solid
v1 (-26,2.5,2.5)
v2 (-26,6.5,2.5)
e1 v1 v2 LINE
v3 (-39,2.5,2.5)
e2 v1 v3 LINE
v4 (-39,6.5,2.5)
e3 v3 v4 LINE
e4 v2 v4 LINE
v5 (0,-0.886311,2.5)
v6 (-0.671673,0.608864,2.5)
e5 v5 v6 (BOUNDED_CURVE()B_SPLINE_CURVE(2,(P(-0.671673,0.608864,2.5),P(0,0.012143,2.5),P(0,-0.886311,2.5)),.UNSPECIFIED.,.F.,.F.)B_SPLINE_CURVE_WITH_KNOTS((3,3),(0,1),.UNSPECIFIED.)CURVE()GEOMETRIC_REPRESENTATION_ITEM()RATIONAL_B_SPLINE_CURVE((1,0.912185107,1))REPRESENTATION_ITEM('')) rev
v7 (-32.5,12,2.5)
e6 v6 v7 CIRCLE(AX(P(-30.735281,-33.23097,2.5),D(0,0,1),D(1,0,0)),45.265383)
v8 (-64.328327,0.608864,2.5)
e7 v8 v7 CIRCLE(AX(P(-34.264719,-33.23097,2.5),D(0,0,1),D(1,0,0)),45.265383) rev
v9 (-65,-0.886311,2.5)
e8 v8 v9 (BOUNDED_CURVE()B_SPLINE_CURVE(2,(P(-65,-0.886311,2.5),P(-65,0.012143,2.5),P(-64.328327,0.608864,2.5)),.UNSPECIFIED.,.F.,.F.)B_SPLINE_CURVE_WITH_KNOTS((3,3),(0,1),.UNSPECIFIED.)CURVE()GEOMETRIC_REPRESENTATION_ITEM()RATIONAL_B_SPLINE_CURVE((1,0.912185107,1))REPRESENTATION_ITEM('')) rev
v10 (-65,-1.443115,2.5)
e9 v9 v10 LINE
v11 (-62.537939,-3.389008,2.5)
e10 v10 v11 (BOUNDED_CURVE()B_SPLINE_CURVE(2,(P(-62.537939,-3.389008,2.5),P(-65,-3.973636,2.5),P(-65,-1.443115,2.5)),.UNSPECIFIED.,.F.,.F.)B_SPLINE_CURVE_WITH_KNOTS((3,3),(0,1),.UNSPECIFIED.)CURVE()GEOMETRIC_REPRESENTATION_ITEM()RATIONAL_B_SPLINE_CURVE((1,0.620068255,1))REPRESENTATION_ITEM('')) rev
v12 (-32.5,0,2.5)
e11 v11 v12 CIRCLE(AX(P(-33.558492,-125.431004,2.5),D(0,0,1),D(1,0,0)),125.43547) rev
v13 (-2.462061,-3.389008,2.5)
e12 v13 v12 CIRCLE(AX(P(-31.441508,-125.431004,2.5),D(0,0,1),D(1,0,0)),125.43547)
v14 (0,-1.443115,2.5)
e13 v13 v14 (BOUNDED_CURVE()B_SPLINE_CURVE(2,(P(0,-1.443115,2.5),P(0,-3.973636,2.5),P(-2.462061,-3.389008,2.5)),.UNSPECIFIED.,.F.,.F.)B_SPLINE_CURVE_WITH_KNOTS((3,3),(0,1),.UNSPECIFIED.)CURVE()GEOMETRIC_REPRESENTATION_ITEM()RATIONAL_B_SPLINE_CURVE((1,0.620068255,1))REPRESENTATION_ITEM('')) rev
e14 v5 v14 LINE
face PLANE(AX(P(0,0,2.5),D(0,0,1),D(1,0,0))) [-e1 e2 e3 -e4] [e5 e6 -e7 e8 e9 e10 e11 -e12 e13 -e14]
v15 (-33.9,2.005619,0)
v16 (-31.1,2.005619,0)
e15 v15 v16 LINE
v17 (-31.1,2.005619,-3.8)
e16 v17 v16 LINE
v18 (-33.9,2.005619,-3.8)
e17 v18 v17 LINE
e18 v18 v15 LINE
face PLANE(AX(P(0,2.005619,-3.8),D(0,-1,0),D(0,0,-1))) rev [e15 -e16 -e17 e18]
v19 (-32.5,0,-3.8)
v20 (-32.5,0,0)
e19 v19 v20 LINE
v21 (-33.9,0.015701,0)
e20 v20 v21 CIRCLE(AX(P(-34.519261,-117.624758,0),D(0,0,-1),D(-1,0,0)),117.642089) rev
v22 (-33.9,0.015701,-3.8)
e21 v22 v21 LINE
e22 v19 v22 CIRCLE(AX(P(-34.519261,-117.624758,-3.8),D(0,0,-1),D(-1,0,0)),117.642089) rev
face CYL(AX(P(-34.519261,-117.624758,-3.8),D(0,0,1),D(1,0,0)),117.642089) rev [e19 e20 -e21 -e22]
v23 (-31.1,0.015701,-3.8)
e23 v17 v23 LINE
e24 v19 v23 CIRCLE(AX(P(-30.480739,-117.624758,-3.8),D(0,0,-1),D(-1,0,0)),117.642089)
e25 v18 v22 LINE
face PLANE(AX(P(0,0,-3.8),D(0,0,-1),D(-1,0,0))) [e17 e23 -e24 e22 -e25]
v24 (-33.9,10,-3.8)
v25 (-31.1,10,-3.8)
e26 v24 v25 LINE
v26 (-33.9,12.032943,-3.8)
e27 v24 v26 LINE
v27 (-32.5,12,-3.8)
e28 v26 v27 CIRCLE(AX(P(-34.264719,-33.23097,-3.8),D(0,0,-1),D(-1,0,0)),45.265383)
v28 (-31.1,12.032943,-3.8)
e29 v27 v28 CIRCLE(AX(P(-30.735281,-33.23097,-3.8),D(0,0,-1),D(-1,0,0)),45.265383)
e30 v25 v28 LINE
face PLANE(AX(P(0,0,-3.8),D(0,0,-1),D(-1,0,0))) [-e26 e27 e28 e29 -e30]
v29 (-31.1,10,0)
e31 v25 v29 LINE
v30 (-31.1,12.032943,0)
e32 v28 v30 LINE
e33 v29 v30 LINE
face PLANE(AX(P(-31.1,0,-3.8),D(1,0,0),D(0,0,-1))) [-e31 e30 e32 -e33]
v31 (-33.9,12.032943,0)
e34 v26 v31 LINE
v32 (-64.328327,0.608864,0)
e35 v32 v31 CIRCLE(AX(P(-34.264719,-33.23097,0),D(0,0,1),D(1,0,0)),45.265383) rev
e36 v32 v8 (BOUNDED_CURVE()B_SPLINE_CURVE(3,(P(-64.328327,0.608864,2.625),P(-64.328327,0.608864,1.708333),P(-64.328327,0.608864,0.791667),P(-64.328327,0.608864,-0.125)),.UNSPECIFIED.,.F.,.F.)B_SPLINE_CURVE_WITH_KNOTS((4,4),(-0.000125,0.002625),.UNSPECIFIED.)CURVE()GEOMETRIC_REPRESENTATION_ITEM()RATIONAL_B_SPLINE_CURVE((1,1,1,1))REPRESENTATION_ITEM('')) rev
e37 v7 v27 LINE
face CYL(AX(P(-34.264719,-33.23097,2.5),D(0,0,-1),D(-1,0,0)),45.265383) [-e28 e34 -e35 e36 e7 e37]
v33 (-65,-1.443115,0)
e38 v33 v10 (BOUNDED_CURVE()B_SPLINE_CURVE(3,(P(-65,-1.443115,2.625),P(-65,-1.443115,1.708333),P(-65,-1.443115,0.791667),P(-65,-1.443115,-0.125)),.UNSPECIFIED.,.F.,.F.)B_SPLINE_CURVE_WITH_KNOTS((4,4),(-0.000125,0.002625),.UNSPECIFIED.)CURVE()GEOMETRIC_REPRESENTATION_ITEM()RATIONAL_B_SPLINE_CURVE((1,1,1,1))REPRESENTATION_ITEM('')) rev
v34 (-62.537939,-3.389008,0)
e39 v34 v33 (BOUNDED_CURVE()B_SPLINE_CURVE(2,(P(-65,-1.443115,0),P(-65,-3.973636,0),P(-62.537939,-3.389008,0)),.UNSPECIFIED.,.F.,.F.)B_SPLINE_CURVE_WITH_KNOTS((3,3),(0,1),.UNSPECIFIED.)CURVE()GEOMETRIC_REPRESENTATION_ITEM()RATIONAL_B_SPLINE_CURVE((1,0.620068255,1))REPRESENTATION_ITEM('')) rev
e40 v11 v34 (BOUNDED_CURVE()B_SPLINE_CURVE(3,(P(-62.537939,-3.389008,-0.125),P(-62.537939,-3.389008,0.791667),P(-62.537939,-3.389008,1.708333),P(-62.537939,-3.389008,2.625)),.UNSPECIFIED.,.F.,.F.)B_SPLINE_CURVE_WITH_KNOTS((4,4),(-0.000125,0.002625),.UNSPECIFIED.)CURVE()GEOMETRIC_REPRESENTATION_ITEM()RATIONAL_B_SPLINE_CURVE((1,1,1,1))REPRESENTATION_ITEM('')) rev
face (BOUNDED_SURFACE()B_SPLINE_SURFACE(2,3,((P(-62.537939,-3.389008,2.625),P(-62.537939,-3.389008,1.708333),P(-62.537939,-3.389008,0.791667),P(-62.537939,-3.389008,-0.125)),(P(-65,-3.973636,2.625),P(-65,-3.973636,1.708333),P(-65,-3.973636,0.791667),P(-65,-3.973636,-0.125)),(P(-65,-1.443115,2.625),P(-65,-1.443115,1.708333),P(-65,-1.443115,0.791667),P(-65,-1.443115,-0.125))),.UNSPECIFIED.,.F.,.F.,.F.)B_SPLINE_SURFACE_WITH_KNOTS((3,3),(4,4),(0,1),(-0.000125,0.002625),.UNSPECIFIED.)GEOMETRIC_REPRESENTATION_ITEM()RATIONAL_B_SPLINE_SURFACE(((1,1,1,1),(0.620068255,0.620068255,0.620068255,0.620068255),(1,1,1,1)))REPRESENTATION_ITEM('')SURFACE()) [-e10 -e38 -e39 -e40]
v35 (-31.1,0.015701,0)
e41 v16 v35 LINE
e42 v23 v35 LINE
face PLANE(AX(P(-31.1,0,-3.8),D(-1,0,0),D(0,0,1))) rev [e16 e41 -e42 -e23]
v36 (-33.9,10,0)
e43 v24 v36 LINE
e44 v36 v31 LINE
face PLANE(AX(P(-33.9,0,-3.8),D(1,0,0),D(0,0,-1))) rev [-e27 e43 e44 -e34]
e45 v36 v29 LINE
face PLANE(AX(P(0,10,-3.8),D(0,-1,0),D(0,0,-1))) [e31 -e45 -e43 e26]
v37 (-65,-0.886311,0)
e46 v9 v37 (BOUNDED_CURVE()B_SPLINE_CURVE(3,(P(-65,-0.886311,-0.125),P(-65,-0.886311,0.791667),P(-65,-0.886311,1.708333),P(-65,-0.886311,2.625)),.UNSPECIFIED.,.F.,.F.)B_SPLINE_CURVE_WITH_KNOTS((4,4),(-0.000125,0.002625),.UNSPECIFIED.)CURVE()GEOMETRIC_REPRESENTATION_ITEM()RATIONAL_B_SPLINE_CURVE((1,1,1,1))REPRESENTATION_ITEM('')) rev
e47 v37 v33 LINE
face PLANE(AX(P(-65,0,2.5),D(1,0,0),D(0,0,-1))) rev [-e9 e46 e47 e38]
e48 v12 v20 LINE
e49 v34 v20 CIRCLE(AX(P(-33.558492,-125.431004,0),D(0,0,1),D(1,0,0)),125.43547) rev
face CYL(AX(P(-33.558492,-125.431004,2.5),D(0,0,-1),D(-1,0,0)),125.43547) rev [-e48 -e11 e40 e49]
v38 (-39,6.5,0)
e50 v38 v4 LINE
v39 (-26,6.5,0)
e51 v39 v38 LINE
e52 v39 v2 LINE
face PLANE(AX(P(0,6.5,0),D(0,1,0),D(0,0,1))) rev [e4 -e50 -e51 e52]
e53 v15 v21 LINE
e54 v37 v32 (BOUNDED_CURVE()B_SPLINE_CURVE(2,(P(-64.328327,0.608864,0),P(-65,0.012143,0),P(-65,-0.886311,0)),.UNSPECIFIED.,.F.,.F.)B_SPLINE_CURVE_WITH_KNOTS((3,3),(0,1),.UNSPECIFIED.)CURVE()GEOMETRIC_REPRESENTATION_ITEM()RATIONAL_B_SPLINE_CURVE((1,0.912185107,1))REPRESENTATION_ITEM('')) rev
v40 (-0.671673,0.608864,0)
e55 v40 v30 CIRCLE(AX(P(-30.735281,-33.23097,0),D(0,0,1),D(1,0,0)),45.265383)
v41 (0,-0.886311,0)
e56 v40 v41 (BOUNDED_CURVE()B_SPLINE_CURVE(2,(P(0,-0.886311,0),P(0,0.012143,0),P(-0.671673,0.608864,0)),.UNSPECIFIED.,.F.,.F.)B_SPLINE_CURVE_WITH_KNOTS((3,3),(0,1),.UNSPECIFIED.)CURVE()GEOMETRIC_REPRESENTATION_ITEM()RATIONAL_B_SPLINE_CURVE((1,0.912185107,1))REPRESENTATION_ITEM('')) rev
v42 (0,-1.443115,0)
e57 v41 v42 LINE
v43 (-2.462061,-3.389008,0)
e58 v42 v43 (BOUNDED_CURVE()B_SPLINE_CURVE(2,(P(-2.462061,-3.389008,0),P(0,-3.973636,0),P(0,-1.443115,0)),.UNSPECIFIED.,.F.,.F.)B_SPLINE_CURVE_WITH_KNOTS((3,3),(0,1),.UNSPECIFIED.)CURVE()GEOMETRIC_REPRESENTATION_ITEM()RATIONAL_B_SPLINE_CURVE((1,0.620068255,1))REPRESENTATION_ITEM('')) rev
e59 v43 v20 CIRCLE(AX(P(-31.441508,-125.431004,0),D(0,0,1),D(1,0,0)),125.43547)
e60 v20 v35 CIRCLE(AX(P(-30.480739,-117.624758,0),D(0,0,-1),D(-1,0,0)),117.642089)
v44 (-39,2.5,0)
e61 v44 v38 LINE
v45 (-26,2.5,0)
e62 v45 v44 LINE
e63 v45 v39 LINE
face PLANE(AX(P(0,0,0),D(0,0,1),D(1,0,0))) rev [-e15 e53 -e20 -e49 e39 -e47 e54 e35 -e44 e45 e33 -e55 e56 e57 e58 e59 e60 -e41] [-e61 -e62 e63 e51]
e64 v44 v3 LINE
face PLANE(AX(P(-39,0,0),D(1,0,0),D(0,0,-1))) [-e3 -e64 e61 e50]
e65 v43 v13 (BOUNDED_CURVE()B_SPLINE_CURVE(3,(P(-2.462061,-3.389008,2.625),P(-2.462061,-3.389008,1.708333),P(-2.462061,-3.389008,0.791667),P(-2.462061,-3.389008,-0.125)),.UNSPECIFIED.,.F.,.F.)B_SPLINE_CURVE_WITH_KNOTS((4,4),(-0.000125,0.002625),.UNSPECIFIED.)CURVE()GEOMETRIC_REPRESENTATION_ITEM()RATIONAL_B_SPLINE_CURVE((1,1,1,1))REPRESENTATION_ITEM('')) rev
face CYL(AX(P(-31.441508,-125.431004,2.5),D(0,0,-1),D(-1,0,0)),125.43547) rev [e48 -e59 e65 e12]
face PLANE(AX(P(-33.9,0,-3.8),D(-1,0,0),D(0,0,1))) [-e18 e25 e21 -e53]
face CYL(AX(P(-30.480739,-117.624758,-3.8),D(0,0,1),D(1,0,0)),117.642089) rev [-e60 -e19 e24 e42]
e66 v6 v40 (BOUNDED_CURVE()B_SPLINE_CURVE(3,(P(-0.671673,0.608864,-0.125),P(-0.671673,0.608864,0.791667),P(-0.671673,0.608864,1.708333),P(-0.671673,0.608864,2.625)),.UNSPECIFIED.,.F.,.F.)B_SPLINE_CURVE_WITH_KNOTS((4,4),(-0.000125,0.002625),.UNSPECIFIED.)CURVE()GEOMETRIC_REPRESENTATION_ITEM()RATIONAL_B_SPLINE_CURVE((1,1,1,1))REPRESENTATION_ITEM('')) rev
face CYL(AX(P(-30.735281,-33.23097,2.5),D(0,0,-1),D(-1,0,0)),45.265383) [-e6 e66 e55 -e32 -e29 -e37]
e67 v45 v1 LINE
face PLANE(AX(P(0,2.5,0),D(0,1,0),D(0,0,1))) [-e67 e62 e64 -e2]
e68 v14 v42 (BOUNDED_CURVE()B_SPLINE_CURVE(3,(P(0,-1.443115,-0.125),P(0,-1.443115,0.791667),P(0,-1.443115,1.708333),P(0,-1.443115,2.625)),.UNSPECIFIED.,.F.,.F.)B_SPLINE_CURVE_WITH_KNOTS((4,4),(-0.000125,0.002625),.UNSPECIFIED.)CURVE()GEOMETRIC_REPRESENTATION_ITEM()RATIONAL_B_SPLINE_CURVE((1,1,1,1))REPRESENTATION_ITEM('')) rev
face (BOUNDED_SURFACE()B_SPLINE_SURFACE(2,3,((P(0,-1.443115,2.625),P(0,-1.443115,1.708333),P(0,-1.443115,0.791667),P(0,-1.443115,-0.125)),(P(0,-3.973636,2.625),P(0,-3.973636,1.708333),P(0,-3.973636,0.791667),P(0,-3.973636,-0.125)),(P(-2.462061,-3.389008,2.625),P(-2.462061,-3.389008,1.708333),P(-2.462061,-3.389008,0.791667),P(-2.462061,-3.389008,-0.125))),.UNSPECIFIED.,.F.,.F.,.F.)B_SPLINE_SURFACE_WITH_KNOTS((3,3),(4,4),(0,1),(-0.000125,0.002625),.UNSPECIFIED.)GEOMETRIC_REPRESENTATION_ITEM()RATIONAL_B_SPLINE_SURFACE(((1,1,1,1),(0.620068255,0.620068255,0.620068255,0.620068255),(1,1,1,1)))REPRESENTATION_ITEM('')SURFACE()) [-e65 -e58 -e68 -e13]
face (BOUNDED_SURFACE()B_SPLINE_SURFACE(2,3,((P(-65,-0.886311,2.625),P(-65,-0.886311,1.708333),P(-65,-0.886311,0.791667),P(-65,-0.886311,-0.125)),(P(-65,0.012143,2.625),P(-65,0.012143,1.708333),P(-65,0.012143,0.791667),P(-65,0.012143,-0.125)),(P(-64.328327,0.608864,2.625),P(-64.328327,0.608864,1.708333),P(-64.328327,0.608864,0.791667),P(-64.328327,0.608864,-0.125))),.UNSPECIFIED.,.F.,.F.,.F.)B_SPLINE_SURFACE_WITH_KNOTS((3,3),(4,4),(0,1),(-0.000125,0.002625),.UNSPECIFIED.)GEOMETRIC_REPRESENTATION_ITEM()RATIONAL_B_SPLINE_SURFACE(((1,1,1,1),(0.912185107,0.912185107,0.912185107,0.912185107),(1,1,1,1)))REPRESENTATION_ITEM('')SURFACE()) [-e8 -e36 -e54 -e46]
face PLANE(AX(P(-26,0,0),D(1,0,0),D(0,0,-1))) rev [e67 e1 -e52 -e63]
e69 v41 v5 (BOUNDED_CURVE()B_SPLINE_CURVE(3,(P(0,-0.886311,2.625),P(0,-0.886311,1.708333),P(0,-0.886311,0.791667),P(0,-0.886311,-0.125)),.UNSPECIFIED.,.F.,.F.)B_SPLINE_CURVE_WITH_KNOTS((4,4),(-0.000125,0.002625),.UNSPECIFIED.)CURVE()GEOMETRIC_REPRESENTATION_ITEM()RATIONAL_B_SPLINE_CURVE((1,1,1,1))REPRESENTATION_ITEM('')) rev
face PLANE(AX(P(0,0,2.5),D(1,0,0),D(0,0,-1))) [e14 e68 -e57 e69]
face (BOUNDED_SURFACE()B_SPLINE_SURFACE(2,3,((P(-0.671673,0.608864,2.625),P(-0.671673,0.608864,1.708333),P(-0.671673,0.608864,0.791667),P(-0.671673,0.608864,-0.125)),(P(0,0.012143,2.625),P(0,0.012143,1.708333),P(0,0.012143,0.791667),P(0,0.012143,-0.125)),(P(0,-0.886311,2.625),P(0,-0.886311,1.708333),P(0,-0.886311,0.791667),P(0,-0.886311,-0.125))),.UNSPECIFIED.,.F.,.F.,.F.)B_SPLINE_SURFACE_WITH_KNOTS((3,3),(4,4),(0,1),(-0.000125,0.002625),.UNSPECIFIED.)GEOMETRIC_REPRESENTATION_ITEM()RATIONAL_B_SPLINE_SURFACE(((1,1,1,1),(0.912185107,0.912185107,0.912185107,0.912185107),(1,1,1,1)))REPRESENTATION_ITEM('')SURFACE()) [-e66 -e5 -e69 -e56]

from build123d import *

# Parameters (mm, degrees)
BOSS_EXTRUDE1_DEPTH = 2.5
SKETCH2_W           = 13
SKETCH2_H           = 4
CUT_EXTRUDE3_DEPTH  = 2.5
BOSS_EXTRUDE2_START = 3.8
BOSS_EXTRUDE2_DEPTH = 3.8
VARFILLET1_R        = 2


with BuildPart() as part:
    # Sketch1 → Boss-Extrude1 (new body)
    with BuildSketch(Plane.XY):
        with BuildLine():
            Line((0, -4), (0, 0))
            ThreePointArc((0, 0), (-15.056525796, 9.23232597), (-32.5, 12))
            ThreePointArc((-32.5, 12), (-49.943474204, 9.23232597), (-65, 0))
            Line((-65, 0), (-65, -4))
            ThreePointArc((-65, -4), (-48.881086926, -0.934918729), (-32.5, 0))
            ThreePointArc((-32.5, 0), (-16.118913074, -0.934918729), (0, -4))
        make_face()
    extrude(amount=BOSS_EXTRUDE1_DEPTH)

    # Sketch2 → Cut-Extrude3 (cut)
    with BuildSketch(Plane.XY.offset(2.5)):
        with Locations((-32.5, 4.5)):
            Rectangle(SKETCH2_W, SKETCH2_H)
    extrude(amount=-CUT_EXTRUDE3_DEPTH, mode=Mode.SUBTRACT)

    # Sketch3 → Boss-Extrude2 (add)
    with BuildSketch(Plane(origin=(0, 0, 0), x_dir=(-1, 0, 0), z_dir=(0, 0, -1)).offset(BOSS_EXTRUDE2_START)):
        with BuildLine():
            ThreePointArc((33.9, 12.032943433), (33.199872595, 12.021886063), (32.5, 12))
            ThreePointArc((32.5, 12), (31.800127405, 12.021886063), (31.1, 12.032943433))
            Line((31.1, 12.032943433), (31.1, 10))
            Line((31.1, 10), (33.9, 10))
            Line((33.9, 10), (33.9, 12.032943433))
        make_face()
        with BuildLine():
            ThreePointArc((31.1, 0.015701129), (31.800023358, 0.009933302), (32.5, 0))
            ThreePointArc((32.5, 0), (33.199976642, 0.009933302), (33.9, 0.015701129))
            Line((33.9, 0.015701129), (33.9, 2.005619302))
            Line((33.9, 2.005619302), (31.1, 2.005619302))
            Line((31.1, 2.005619302), (31.1, 0.015701129))
        make_face()
    extrude(amount=-BOSS_EXTRUDE2_DEPTH)

    # VarFillet1
    varfillet1_edges = [part.edges().sort_by_distance(p)[0] for p in [
        (0, -4, 1.25),
        (0, 0, 1.25),
        (-65, -4, 1.25),
        (-65, 0, 1.25),
    ]]
    fillet(varfillet1_edges, radius=VARFILLET1_R)


solid = part.part
